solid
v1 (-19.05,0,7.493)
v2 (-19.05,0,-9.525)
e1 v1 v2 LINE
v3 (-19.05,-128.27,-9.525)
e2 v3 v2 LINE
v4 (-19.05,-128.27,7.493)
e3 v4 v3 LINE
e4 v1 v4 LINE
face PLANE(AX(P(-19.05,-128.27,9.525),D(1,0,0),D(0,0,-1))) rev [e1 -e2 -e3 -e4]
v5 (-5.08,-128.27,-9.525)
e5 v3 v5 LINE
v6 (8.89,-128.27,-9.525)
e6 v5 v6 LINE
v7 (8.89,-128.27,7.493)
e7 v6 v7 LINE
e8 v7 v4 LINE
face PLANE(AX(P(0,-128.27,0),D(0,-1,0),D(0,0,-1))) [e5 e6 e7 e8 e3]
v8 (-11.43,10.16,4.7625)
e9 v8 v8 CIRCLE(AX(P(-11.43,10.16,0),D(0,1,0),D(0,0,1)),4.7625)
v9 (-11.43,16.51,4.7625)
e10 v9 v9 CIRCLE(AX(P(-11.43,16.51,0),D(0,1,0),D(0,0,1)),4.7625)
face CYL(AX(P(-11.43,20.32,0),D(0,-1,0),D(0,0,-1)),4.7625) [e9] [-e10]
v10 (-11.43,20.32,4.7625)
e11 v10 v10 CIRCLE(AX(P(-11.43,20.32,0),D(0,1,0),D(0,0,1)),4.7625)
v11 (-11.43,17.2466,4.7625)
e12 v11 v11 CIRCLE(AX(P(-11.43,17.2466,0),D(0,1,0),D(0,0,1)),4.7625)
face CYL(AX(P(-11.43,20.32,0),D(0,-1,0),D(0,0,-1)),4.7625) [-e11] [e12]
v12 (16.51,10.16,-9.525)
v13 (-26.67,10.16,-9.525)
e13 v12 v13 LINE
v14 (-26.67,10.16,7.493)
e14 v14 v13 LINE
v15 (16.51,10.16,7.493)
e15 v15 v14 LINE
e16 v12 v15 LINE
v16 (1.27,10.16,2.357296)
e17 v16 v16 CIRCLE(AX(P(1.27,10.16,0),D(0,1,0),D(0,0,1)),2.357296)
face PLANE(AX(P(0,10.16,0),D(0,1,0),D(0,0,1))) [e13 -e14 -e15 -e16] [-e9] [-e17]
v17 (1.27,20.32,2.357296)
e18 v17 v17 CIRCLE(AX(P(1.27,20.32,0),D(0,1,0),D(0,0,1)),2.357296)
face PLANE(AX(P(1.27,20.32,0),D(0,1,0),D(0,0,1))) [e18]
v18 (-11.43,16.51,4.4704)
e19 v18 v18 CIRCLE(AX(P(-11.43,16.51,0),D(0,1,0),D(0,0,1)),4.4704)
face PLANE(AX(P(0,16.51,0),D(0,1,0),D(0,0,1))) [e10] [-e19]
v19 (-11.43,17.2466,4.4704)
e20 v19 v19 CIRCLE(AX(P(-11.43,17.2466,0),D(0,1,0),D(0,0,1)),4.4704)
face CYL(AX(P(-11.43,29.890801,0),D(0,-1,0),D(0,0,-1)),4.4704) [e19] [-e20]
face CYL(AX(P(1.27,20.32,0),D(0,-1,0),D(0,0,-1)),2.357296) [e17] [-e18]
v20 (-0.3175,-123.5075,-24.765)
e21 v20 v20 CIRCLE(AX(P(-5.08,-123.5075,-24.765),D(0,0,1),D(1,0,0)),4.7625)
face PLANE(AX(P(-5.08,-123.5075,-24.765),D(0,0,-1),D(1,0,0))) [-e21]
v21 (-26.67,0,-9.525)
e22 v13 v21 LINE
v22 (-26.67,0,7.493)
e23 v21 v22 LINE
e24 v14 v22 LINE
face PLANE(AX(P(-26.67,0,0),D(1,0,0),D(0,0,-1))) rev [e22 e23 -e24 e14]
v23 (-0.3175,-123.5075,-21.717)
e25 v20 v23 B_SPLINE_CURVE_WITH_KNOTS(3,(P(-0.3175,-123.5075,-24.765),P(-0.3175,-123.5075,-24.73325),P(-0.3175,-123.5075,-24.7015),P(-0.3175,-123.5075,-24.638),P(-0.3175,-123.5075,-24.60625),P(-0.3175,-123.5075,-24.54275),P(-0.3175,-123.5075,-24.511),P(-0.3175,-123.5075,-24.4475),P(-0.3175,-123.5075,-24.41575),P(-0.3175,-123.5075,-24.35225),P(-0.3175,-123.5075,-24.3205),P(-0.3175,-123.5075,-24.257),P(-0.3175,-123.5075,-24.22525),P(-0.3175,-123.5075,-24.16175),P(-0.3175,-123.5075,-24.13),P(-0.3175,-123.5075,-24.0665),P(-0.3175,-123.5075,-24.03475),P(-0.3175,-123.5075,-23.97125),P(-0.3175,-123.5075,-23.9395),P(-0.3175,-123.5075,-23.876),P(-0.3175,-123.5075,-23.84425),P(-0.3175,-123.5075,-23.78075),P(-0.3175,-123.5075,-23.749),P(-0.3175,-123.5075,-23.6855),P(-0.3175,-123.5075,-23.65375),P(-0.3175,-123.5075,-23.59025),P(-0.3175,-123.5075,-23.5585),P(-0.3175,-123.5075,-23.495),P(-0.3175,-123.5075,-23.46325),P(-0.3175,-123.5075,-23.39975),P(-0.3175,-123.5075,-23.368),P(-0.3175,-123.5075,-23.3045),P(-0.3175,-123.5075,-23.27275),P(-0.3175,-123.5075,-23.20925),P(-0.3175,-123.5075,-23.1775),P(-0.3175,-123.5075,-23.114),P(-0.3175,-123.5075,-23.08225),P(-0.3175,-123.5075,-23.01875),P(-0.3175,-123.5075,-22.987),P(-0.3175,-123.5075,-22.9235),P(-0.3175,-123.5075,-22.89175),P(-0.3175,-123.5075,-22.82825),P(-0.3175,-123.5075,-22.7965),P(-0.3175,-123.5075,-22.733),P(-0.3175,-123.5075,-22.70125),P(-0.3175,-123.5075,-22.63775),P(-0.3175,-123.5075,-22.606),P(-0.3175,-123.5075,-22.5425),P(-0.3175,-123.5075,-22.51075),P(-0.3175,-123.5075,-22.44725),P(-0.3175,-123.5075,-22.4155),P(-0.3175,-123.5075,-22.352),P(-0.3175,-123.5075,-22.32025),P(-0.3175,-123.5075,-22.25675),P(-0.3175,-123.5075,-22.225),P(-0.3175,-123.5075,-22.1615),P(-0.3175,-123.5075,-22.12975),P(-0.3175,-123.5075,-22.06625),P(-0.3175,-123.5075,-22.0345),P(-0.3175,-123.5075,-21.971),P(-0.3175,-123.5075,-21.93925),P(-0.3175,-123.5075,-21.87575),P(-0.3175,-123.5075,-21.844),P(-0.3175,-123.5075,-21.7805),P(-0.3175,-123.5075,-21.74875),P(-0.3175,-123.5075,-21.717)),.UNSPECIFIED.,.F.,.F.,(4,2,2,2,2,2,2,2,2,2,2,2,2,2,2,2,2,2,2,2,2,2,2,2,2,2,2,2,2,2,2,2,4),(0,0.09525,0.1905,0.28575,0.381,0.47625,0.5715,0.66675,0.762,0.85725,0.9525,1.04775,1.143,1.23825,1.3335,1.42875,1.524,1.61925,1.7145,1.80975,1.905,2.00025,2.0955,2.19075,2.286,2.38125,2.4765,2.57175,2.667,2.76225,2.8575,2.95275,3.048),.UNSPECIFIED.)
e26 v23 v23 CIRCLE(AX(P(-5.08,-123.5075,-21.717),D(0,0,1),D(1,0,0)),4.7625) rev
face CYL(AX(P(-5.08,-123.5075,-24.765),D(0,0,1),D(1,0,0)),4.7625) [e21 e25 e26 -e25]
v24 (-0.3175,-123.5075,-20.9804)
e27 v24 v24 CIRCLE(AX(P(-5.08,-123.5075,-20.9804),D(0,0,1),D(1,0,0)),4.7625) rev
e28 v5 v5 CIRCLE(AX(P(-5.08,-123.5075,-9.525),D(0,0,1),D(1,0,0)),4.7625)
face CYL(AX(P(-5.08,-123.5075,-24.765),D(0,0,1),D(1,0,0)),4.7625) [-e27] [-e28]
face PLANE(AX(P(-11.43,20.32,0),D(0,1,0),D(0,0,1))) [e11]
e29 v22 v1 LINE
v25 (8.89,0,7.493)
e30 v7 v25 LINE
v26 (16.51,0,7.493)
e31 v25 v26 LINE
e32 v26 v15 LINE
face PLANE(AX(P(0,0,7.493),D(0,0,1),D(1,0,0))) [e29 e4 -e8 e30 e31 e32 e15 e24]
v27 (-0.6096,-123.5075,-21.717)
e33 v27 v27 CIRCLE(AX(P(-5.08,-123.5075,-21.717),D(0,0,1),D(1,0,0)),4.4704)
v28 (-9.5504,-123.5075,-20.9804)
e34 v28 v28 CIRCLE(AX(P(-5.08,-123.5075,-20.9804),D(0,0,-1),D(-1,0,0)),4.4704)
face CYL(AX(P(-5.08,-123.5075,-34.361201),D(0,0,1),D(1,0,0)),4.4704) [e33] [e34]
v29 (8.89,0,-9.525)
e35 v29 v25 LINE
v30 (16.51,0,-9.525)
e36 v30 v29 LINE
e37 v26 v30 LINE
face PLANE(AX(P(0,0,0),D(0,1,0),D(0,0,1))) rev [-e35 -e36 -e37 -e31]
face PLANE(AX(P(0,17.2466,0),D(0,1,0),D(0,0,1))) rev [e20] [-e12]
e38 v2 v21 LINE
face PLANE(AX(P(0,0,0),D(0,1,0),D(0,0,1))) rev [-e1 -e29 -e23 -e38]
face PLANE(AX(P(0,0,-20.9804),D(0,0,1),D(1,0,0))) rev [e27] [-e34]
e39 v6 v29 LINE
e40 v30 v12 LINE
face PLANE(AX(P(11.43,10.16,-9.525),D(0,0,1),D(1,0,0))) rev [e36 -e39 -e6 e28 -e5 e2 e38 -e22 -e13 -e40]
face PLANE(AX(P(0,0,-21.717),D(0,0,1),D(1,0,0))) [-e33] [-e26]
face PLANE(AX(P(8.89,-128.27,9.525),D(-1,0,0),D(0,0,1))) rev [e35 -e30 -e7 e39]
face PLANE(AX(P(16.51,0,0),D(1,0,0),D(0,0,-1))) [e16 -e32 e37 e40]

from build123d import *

# Parameters (mm, degrees)
SKETCH1_W              = 33.02
SKETCH1_H              = 19.05
BOSS_EXTRUDE1_DEPTH    = 10.16
SKETCH2_R              = 4.7625
SKETCH2_R_2            = 2.357295936
BOSS_EXTRUDE2_DEPTH    = 10.16
SKETCH5_W              = 19.05
SKETCH5_H              = 10.16
BOSS_EXTRUDE3_DEPTH    = 5.08
SKETCH6_W              = 19.05
SKETCH6_H              = 10.16
BOSS_EXTRUDE4_DEPTH    = 5.08
SKETCH7_W              = 27.94
SKETCH7_H              = 19.05
BOSS_EXTRUDE5_DEPTH    = 128.27
SKETCH9_R              = 4.7625
BOSS_EXTRUDE6_DEPTH    = 15.24
CUT_EXTRUDE3_START     = -21.717
CUT_EXTRUDE3_OUTLINE_R = 4.7625
CUT_EXTRUDE3_DEPTH     = 0.7366
SKETCH13_R             = 4.4704
BOSS_EXTRUDE8_DEPTH    = 0.7366
SKETCH14_W             = 27.94
SKETCH14_H             = 10.16
CUT_EXTRUDE4_DEPTH     = 15.24
SKETCH15_W             = 43.18
SKETCH15_H             = 138.43
CUT_EXTRUDE5_DEPTH     = 2.032
CUT_EXTRUDE6_START     = 16.51
CUT_EXTRUDE6_OUTLINE_R = 4.7625
CUT_EXTRUDE6_DEPTH     = 0.7366
SKETCH16_R             = 4.4704
BOSS_EXTRUDE9_DEPTH    = 0.7366


# Read off the part's stored shape, not the designer's step: Cut-Extrude3, Cut-Extrude6
with BuildPart() as part:
    # Sketch1 → Boss-Extrude1 (new body)
    with BuildSketch(Plane(origin=(0, 0, 0), x_dir=(1, 0, 0), z_dir=(0, 1, 0))):
        with Locations((-5.08, 0)):
            Rectangle(SKETCH1_W, SKETCH1_H)
    extrude(amount=BOSS_EXTRUDE1_DEPTH)

    # Sketch2 → Boss-Extrude2 (add)
    with BuildSketch(Plane(origin=(0, 10.16, 0), x_dir=(1, 0, 0), z_dir=(0, 1, 0))):
        with Locations(Location((-11.43, 0, 0), (0, 0, 270))):
            Circle(SKETCH2_R)
        with Locations(Location((1.27, 0, 0), (0, 0, 270))):
            Circle(SKETCH2_R_2)
    extrude(amount=BOSS_EXTRUDE2_DEPTH)

    # Sketch5 → Boss-Extrude3 (add)
    with BuildSketch(Plane.ZY.offset(21.59)):
        with Locations((0, 5.08)):
            Rectangle(SKETCH5_W, SKETCH5_H)
    extrude(amount=BOSS_EXTRUDE3_DEPTH)

    # Sketch6 → Boss-Extrude4 (add)
    with BuildSketch(Plane(origin=(11.43, 0, 0), x_dir=(0, 0, -1), z_dir=(1, 0, 0))):
        with Locations((0, 5.08)):
            Rectangle(SKETCH6_W, SKETCH6_H)
    extrude(amount=BOSS_EXTRUDE4_DEPTH)

    # Sketch7 → Boss-Extrude5 (add)
    with BuildSketch(Plane(origin=(0, 0, 0), x_dir=(-1, 0, 0), z_dir=(0, -1, 0))):
        with Locations((5.08, 0)):
            Rectangle(SKETCH7_W, SKETCH7_H)
    extrude(amount=BOSS_EXTRUDE5_DEPTH)

    # Sketch9 → Boss-Extrude6 (add)
    with BuildSketch(Plane.XY.offset(9.525)):
        with Locations(Location((-5.08, -123.5075, 0), (0, 0, 270))):
            Circle(SKETCH9_R)
    boss_extrude6 = extrude(amount=BOSS_EXTRUDE6_DEPTH)

    # Mirror5: Boss-Extrude6 across plane
    add(boss_extrude6.mirror(Plane.XY))

    # Cut-Extrude3 outline → Cut-Extrude3 (cut)
    with BuildSketch(Plane.XY.offset(CUT_EXTRUDE3_START)):
        with Locations((-5.08, -123.5075)):
            Circle(CUT_EXTRUDE3_OUTLINE_R)
    extrude(amount=CUT_EXTRUDE3_DEPTH, mode=Mode.SUBTRACT)

    # Sketch13 → Boss-Extrude8 (add)
    with BuildSketch(Plane(origin=(0, 0, -20.9804), x_dir=(-1, 0, 0), z_dir=(0, 0, -1))):
        with Locations(Location((5.08, -123.5075, 0), (0, 0, 180))):
            Circle(SKETCH13_R)
    extrude(amount=BOSS_EXTRUDE8_DEPTH)

    # Sketch14 → Cut-Extrude4 (cut)
    with BuildSketch(Plane.XY.offset(9.525)):
        with Locations((-5.08, -123.19)):
            Rectangle(SKETCH14_W, SKETCH14_H)
    extrude(amount=CUT_EXTRUDE4_DEPTH, mode=Mode.SUBTRACT)

    # Sketch15 → Cut-Extrude5 (cut)
    with BuildSketch(Plane.XY.offset(9.525)):
        with Locations((-5.08, -59.055)):
            Rectangle(SKETCH15_W, SKETCH15_H)
    extrude(amount=-CUT_EXTRUDE5_DEPTH, mode=Mode.SUBTRACT)

    # Cut-Extrude6 outline → Cut-Extrude6 (cut)
    with BuildSketch(Plane(origin=(0, 0, 0), x_dir=(1, 0, 0), z_dir=(0, 1, 0)).offset(CUT_EXTRUDE6_START)):
        with Locations((-11.43, 0)):
            Circle(CUT_EXTRUDE6_OUTLINE_R)
    extrude(amount=CUT_EXTRUDE6_DEPTH, mode=Mode.SUBTRACT)

    # Sketch16 → Boss-Extrude9 (add)
    with BuildSketch(Plane(origin=(0, 16.51, 0), x_dir=(1, 0, 0), z_dir=(0, 1, 0))):
        with Locations(Location((-11.43, 0, 0), (0, 0, 270))):
            Circle(SKETCH16_R)
    extrude(amount=BOSS_EXTRUDE9_DEPTH)


solid = part.part
